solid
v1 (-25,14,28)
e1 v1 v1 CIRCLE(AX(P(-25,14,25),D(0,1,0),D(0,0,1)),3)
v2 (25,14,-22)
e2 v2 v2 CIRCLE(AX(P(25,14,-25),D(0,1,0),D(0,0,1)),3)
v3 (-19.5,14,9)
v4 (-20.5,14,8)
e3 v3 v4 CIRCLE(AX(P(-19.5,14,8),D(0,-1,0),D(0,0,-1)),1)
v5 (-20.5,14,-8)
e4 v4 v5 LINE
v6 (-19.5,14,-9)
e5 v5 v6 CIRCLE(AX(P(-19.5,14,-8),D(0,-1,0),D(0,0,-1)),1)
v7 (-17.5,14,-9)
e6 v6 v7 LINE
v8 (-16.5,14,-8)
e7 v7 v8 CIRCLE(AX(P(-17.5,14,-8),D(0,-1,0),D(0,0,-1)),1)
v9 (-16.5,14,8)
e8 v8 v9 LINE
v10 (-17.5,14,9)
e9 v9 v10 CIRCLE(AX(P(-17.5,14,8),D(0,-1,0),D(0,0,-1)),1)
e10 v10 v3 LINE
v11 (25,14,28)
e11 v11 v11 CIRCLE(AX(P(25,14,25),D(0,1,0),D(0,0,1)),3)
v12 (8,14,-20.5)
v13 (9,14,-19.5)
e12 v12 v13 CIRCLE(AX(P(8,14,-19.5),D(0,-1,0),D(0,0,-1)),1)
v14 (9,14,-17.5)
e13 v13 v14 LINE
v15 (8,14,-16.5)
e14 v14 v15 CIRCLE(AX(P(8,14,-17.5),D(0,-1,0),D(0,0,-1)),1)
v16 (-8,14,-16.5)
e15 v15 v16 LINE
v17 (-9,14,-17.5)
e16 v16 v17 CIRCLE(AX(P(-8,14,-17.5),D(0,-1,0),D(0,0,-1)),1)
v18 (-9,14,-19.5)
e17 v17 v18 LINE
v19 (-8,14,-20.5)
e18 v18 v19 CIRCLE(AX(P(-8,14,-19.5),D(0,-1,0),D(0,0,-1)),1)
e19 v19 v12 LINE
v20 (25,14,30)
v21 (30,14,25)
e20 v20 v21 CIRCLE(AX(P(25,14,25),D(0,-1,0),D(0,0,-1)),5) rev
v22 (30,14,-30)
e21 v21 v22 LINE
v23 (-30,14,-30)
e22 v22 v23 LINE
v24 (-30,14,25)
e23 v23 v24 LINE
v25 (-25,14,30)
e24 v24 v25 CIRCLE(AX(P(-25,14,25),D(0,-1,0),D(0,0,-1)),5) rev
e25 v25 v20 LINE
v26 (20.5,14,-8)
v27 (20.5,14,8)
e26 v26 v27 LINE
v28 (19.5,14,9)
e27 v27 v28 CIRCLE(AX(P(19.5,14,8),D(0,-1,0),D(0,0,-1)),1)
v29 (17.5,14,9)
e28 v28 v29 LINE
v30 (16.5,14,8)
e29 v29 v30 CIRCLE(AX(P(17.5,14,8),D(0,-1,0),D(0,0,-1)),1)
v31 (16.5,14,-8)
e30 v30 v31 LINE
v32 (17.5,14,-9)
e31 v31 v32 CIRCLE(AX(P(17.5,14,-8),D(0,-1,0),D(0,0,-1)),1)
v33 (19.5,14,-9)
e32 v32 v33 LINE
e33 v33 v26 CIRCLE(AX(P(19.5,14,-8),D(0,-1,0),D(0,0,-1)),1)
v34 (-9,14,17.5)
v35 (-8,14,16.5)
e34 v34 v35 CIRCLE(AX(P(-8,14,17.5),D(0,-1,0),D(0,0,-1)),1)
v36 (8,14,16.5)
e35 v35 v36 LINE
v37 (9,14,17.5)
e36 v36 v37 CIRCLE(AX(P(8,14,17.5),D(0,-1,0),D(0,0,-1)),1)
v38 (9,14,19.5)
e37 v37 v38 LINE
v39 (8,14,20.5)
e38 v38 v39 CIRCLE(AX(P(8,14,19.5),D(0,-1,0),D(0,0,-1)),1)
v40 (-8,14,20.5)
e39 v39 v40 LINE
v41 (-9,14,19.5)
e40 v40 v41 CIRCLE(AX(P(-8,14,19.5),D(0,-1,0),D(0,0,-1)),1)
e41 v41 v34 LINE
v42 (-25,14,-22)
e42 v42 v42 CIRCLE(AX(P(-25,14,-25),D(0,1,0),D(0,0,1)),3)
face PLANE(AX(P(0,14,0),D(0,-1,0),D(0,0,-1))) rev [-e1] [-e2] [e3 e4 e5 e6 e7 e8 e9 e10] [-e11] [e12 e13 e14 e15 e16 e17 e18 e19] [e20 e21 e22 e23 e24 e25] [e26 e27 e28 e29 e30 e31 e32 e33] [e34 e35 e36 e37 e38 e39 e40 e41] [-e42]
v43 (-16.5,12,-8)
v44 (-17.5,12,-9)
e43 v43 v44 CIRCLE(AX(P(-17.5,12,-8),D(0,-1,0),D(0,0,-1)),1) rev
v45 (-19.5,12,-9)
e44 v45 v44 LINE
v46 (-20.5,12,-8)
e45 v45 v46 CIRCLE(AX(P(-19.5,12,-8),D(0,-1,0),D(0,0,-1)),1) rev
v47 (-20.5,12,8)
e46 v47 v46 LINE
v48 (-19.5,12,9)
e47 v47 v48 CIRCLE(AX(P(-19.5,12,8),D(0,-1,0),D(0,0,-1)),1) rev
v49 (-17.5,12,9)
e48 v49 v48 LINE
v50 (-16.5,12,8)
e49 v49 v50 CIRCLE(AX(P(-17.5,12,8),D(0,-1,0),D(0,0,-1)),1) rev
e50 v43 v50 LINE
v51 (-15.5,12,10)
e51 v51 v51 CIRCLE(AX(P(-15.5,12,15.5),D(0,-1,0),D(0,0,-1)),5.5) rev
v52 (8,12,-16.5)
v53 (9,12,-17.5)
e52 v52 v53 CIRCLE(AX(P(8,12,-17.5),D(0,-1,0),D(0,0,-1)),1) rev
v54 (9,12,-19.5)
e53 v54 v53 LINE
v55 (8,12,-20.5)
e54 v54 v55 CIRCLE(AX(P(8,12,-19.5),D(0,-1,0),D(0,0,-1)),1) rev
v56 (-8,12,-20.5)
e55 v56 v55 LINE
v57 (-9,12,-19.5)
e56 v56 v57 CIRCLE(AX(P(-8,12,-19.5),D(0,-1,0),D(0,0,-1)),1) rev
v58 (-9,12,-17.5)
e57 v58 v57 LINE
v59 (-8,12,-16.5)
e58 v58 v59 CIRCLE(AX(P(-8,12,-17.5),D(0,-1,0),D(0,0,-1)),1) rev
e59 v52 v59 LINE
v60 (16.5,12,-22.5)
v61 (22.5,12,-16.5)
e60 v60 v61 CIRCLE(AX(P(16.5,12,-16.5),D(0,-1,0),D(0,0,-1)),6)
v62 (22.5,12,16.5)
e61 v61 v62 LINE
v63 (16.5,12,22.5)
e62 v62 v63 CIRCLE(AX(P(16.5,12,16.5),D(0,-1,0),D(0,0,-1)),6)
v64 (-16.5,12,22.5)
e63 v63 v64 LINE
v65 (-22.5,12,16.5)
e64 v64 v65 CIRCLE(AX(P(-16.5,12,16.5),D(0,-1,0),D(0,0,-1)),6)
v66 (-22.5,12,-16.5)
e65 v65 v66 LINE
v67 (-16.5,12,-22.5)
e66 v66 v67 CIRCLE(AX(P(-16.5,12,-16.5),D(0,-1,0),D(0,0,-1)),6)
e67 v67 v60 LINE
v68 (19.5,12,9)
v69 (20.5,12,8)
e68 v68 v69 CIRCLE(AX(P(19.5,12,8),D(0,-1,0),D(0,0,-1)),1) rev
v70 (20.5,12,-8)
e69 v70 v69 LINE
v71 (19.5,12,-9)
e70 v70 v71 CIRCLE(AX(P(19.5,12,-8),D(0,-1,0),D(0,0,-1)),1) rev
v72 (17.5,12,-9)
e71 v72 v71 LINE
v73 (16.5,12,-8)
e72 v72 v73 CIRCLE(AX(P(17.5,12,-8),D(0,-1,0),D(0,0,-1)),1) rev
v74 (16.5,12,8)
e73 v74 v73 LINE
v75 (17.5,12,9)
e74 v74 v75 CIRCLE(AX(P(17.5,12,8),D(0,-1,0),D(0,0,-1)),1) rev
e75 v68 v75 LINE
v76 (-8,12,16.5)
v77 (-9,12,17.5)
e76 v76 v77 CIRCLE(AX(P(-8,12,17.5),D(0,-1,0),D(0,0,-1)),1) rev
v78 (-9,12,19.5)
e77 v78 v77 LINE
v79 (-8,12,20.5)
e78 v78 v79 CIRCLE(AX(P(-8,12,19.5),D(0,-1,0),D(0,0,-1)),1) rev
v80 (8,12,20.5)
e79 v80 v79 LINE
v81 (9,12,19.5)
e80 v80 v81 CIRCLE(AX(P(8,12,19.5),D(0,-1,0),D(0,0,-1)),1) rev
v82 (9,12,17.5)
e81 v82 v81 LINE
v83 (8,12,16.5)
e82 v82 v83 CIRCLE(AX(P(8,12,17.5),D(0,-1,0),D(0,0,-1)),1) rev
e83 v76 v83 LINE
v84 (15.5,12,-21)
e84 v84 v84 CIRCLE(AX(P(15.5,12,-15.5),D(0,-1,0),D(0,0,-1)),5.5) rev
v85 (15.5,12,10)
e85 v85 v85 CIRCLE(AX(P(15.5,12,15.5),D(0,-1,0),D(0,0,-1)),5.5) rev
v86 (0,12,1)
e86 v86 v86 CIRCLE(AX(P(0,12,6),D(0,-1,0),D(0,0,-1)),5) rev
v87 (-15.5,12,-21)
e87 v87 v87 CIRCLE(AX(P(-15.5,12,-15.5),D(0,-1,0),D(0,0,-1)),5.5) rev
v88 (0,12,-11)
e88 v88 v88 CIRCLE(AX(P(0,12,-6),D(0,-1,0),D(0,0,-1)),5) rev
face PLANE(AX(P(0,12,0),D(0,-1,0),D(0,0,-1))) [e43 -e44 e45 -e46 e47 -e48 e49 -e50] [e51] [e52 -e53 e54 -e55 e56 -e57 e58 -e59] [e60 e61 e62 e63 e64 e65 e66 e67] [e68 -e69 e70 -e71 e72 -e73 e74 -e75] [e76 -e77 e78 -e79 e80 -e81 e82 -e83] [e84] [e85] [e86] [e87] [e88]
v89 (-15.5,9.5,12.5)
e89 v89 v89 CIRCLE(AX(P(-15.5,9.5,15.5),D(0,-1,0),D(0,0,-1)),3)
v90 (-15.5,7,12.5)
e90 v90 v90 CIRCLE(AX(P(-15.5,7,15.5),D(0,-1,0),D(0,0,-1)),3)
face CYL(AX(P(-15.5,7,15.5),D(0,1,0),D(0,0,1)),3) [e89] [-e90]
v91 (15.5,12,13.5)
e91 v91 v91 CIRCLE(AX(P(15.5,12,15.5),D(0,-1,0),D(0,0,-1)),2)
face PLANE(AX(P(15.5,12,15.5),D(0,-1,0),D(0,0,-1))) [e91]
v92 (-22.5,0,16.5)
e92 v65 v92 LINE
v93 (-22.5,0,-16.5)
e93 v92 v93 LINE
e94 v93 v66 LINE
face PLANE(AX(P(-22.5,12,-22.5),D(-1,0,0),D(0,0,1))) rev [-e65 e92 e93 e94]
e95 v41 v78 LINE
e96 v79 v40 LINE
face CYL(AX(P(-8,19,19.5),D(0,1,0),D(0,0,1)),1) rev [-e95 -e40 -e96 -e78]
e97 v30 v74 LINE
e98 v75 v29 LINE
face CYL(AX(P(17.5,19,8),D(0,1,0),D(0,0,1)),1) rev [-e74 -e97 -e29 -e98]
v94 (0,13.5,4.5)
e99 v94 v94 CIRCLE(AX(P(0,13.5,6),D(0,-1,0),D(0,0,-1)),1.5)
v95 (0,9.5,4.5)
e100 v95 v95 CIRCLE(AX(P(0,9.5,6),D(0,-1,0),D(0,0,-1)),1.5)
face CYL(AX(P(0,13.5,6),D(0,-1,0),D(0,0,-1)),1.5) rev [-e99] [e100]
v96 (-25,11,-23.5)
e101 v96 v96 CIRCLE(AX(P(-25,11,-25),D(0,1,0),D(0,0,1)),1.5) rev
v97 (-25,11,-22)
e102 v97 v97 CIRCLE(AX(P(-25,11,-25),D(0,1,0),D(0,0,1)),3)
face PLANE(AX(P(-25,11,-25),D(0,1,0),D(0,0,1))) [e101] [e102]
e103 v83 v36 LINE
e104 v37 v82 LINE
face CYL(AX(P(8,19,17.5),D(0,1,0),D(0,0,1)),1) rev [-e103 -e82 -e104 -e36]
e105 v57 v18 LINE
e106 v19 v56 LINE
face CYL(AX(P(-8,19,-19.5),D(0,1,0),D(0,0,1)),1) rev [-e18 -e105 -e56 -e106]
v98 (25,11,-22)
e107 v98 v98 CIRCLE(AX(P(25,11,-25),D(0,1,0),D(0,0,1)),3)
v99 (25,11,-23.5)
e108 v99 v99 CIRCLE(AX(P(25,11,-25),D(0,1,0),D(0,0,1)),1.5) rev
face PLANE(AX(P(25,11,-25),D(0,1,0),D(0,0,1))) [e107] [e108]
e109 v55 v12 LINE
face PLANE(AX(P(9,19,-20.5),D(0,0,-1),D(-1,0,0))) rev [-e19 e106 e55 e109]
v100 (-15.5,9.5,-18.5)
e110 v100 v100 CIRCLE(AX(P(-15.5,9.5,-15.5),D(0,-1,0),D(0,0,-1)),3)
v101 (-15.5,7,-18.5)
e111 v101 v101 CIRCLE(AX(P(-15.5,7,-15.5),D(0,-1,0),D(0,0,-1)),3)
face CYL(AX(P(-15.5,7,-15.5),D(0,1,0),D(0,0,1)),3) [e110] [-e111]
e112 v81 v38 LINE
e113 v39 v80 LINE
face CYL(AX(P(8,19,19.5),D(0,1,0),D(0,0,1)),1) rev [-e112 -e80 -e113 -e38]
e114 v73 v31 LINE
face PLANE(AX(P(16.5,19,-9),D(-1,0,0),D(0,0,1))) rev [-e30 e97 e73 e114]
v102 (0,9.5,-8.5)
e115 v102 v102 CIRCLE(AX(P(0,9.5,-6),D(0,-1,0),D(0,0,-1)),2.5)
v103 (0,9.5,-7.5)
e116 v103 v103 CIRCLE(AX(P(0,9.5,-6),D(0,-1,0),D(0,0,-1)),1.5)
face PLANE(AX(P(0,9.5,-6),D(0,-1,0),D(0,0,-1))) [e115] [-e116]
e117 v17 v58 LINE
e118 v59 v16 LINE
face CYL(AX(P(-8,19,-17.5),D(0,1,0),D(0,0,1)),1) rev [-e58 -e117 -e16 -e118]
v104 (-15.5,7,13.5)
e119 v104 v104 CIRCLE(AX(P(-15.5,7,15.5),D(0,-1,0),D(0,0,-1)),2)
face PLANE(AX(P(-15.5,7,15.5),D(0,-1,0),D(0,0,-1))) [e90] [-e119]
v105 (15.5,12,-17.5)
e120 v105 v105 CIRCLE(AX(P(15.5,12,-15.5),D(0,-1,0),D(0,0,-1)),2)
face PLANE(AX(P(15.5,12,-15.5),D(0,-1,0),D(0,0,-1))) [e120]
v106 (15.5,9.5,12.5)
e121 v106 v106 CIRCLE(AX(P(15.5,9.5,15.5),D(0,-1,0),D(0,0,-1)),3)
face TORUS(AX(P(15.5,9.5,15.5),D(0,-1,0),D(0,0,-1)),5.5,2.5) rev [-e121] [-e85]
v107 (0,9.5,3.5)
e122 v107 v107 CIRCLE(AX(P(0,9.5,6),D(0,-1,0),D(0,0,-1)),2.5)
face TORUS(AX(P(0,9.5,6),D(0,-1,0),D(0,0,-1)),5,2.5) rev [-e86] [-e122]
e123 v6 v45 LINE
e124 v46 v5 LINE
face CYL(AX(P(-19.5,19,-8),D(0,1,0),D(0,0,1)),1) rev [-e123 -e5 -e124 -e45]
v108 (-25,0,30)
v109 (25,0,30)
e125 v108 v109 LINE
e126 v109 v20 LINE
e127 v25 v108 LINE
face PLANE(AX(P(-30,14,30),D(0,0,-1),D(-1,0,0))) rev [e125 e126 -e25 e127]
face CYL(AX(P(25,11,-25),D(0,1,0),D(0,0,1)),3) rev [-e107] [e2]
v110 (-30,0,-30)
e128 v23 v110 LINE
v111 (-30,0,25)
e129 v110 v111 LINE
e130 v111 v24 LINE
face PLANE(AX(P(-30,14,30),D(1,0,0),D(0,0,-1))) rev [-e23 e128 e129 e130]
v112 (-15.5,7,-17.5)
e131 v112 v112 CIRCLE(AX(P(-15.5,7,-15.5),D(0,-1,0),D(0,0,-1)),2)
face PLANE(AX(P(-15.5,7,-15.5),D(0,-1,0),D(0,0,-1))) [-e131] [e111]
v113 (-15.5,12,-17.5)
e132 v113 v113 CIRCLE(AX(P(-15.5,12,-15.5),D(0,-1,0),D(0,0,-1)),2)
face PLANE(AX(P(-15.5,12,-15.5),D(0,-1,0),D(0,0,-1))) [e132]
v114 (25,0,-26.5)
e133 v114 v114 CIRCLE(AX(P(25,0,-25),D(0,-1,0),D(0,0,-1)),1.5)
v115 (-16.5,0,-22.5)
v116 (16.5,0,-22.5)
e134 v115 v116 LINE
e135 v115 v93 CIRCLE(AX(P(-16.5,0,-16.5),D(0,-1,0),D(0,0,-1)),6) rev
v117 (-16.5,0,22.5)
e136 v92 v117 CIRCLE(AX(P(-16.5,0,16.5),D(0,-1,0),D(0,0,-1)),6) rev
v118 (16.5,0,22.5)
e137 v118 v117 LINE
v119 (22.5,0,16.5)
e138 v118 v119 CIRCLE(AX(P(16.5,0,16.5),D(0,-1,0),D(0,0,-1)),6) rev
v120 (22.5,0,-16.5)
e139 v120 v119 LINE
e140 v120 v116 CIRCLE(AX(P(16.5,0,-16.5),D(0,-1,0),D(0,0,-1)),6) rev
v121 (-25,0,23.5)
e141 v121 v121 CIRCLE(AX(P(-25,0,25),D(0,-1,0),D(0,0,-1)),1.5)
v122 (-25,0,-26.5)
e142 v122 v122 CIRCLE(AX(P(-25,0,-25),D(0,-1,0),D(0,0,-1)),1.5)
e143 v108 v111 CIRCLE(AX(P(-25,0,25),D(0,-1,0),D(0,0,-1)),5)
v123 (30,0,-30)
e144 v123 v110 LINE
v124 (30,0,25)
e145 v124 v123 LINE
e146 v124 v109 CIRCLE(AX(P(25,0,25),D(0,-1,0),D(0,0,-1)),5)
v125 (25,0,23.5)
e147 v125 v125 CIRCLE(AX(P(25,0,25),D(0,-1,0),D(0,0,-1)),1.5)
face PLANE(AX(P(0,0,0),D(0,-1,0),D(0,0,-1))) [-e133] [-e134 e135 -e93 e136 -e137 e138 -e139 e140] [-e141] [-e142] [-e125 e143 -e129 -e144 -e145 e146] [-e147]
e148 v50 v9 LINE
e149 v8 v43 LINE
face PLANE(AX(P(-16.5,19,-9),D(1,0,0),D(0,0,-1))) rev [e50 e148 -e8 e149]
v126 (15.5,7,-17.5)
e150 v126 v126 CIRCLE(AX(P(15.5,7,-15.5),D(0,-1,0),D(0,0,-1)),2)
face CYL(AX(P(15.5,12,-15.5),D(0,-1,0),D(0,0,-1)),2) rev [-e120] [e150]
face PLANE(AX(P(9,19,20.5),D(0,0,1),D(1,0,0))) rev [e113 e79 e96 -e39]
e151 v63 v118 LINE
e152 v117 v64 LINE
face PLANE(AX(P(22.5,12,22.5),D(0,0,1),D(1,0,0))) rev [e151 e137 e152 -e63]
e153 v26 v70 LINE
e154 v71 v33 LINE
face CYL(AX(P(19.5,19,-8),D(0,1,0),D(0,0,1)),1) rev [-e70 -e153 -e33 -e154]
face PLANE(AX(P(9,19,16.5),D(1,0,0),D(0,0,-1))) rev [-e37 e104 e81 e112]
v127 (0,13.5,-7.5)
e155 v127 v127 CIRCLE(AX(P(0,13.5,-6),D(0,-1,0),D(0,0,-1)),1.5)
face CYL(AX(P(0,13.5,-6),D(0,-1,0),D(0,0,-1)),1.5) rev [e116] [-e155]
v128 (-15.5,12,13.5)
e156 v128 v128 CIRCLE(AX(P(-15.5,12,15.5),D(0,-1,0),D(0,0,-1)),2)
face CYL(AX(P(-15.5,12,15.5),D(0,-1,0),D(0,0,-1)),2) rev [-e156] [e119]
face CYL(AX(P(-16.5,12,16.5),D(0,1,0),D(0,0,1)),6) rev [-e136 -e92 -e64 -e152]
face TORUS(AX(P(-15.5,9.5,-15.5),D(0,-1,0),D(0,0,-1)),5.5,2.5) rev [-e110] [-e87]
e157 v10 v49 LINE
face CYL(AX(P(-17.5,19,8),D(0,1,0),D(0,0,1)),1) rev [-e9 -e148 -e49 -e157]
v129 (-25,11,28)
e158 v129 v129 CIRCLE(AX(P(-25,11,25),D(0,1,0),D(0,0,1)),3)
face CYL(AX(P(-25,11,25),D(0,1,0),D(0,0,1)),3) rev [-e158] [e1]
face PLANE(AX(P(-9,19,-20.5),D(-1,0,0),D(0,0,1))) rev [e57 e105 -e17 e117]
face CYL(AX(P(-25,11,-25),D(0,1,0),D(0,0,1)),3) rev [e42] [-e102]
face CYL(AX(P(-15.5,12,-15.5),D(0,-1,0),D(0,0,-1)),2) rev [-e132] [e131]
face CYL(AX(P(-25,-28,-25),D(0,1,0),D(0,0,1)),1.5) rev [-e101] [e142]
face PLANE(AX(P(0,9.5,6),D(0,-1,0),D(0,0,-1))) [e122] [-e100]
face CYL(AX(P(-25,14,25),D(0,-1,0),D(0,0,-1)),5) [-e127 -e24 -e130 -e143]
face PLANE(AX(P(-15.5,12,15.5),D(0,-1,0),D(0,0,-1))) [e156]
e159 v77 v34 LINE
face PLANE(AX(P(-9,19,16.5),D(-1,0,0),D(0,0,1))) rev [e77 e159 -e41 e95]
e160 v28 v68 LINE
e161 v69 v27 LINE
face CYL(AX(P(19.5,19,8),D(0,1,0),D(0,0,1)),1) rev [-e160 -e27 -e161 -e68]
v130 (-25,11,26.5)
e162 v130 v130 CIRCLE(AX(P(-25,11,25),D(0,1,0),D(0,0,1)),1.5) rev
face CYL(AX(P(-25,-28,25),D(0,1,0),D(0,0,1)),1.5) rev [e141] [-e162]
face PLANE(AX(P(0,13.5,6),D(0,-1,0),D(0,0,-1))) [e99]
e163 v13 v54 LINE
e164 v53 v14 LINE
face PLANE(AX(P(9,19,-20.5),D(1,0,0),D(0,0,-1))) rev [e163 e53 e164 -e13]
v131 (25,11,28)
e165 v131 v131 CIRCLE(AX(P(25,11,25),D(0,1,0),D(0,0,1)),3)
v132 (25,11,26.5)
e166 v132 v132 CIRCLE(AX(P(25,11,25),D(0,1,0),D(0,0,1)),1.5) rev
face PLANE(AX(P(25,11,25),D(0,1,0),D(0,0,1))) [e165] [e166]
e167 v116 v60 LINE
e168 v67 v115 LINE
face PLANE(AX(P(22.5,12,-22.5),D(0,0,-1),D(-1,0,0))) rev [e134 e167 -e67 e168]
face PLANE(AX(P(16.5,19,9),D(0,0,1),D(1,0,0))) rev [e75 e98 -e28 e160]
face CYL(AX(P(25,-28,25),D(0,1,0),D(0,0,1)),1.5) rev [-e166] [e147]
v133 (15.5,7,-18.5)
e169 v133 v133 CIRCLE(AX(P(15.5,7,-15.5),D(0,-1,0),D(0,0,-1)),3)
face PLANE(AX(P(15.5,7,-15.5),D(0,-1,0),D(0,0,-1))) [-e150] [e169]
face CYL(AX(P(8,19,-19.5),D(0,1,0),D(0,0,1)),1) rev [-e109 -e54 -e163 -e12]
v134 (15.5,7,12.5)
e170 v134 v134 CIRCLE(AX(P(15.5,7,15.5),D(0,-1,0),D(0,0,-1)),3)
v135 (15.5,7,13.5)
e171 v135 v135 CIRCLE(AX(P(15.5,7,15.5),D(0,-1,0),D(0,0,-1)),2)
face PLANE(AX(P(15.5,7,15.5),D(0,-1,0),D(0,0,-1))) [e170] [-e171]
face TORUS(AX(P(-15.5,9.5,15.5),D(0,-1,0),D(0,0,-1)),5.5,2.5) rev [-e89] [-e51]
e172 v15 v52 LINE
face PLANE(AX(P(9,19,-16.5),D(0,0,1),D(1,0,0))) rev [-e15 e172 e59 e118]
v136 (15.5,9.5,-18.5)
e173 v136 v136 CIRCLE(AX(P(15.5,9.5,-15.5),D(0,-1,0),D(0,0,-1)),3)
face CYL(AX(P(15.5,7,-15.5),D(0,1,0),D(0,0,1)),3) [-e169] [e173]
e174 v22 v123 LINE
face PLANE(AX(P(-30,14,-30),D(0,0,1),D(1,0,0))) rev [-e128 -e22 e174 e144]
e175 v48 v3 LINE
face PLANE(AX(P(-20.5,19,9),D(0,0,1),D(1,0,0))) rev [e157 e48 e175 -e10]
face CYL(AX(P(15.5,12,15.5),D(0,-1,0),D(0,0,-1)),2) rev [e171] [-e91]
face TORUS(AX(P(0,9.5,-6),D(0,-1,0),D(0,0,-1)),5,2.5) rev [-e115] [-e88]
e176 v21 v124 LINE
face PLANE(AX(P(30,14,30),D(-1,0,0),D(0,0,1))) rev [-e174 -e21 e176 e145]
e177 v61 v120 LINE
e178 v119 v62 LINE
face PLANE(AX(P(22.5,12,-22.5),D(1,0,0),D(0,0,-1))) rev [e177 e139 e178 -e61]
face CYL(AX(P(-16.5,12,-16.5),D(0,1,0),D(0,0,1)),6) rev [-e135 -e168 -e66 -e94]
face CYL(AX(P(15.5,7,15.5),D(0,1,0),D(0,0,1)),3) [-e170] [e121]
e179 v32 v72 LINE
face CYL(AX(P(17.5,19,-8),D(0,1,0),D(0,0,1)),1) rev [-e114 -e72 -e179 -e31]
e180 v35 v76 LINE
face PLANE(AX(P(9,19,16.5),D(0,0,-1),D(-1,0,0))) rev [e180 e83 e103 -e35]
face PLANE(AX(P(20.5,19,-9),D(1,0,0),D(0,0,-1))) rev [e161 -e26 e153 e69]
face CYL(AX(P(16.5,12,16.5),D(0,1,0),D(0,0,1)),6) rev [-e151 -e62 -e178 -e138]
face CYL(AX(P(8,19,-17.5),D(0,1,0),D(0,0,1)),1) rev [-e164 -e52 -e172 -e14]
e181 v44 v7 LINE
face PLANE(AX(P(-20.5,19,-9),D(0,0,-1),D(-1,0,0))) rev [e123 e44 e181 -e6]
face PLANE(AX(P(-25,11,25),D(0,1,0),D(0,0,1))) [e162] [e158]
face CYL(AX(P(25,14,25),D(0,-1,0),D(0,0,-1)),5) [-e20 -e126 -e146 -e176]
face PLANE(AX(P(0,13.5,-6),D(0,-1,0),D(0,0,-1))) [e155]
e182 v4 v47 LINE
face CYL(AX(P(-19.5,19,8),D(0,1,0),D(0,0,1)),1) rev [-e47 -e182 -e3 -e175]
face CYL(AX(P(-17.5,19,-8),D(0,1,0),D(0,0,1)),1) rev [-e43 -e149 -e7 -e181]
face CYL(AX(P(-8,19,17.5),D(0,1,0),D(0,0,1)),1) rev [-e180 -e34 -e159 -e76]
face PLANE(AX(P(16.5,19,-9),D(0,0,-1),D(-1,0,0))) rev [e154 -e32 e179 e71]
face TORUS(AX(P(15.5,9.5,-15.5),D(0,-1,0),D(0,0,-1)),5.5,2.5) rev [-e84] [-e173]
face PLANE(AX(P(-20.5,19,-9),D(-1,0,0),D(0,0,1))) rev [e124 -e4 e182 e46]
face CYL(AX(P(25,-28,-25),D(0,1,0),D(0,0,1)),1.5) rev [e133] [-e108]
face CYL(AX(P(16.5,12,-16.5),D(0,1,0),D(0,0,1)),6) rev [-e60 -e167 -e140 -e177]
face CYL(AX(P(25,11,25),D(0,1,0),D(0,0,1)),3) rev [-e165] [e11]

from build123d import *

# Parameters (mm, degrees)
SKETCH1_W           = 60
SKETCH1_H           = 60
BOSS_EXTRUDE1_DEPTH = 14
SKETCH2_R           = 1.5
CUT_EXTRUDE1_DEPTH  = 42
SKETCH3_R           = 3
CUT_EXTRUDE2_DEPTH  = 3
SKETCH4_W           = 45
SKETCH4_H           = 45
CUT_EXTRUDE3_DEPTH  = 12
SKETCH5_W           = 18
SKETCH5_H           = 4
SKETCH5_W_2         = 4
SKETCH5_H_2         = 18
CUT_EXTRUDE4_DEPTH  = 7
SKETCH6_R           = 2.5
BOSS_EXTRUDE2_DEPTH = 2.5
SKETCH7_R           = 1.5
CUT_EXTRUDE5_DEPTH  = 4
FILLET1_R           = 2.5
SKETCH8_R           = 3
BOSS_EXTRUDE3_DEPTH = 5
FILLET2_R           = 2.5
SKETCH9_R           = 2
CUT_EXTRUDE6_DEPTH  = 5
FILLET3_R           = 1
FILLET4_R           = 6
FILLET5_R           = 5


with BuildPart() as part:
    # Sketch1 → Boss-Extrude1 (new body)
    with BuildSketch(Plane(origin=(0, 0, 0), x_dir=(1, 0, 0), z_dir=(0, 1, 0))):
        Rectangle(SKETCH1_W, SKETCH1_H)
    extrude(amount=BOSS_EXTRUDE1_DEPTH)

    # Sketch2 → Cut-Extrude1 (cut)
    with BuildSketch(Plane(origin=(0, 14, 0), x_dir=(1, 0, 0), z_dir=(0, 1, 0))):
        with Locations(Location((-25, 25, 0), (0, 0, 270))):
            Circle(SKETCH2_R)
        with Locations(Location((-25, -25, 0), (0, 0, 270))):
            Circle(SKETCH2_R)
        with Locations(Location((25, -25, 0), (0, 0, 270))):
            Circle(SKETCH2_R)
        with Locations(Location((25, 25, 0), (0, 0, 270))):
            Circle(SKETCH2_R)
    extrude(amount=-CUT_EXTRUDE1_DEPTH, mode=Mode.SUBTRACT)

    # Sketch3 → Cut-Extrude2 (cut)
    with BuildSketch(Plane(origin=(0, 14, 0), x_dir=(1, 0, 0), z_dir=(0, 1, 0))):
        with Locations(Location((-25, 25, 0), (0, 0, 270))):
            Circle(SKETCH3_R)
        with Locations(Location((-25, -25, 0), (0, 0, 270))):
            Circle(SKETCH3_R)
        with Locations(Location((25, -25, 0), (0, 0, 270))):
            Circle(SKETCH3_R)
        with Locations(Location((25, 25, 0), (0, 0, 270))):
            Circle(SKETCH3_R)
    extrude(amount=-CUT_EXTRUDE2_DEPTH, mode=Mode.SUBTRACT)

    # Sketch4 → Cut-Extrude3 (cut)
    with BuildSketch(Plane.XZ):
        Rectangle(SKETCH4_W, SKETCH4_H)
    extrude(amount=-CUT_EXTRUDE3_DEPTH, mode=Mode.SUBTRACT)

    # Sketch5 → Cut-Extrude4 (cut)
    with BuildSketch(Plane.XZ.offset(-12)):
        with Locations((0, 18.5)):
            Rectangle(SKETCH5_W, SKETCH5_H)
        with Locations((0, -18.5)):
            Rectangle(SKETCH5_W, SKETCH5_H)
        with Locations((-18.5, 0)):
            Rectangle(SKETCH5_W_2, SKETCH5_H_2)
        with Locations((18.5, 0)):
            Rectangle(SKETCH5_W_2, SKETCH5_H_2)
    extrude(amount=-CUT_EXTRUDE4_DEPTH, mode=Mode.SUBTRACT)

    # Sketch6 → Boss-Extrude2 (add)
    with BuildSketch(Plane.XZ.offset(-12)):
        with Locations(Location((0, 6, 0), (0, 0, 270))):
            Circle(SKETCH6_R)
        with Locations(Location((0, -6, 0), (0, 0, 270))):
            Circle(SKETCH6_R)
    extrude(amount=BOSS_EXTRUDE2_DEPTH)

    # Sketch7 → Cut-Extrude5 (cut)
    with BuildSketch(Plane.XZ.offset(-9.5)):
        with Locations(Location((0, 6, 0), (0, 0, 270))):
            Circle(SKETCH7_R)
        with Locations(Location((0, -6, 0), (0, 0, 270))):
            Circle(SKETCH7_R)
    extrude(amount=-CUT_EXTRUDE5_DEPTH, mode=Mode.SUBTRACT)

    # Fillet1
    fillet1_edges = [part.edges().sort_by_distance(p)[0] for p in [
        (0, 12, 8.5),
        (0, 12, -3.5),
    ]]
    fillet(fillet1_edges, radius=FILLET1_R - 0.0001)  # a hair under: the kernel refuses the full size

    # Sketch8 → Boss-Extrude3 (add)
    with BuildSketch(Plane.XZ.offset(-12)):
        with Locations(Location((-15.5, 15.5, 0), (0, 0, 270))):
            Circle(SKETCH8_R)
        with Locations(Location((15.5, 15.5, 0), (0, 0, 270))):
            Circle(SKETCH8_R)
        with Locations(Location((15.5, -15.5, 0), (0, 0, 270))):
            Circle(SKETCH8_R)
        with Locations(Location((-15.5, -15.5, 0), (0, 0, 270))):
            Circle(SKETCH8_R)
    extrude(amount=BOSS_EXTRUDE3_DEPTH)

    # Fillet2
    fillet2_edges = [part.edges().sort_by_distance(p)[0] for p in [
        (-15.5, 12, -12.5),
        (15.5, 12, -12.5),
        (15.5, 12, 18.5),
        (-15.5, 12, 18.5),
    ]]
    fillet(fillet2_edges, radius=FILLET2_R)

    # Sketch9 → Cut-Extrude6 (cut)
    with BuildSketch(Plane.XZ.offset(-7)):
        with Locations(Location((-15.5, 15.5, 0), (0, 0, 270))):
            Circle(SKETCH9_R)
        with Locations(Location((-15.5, -15.5, 0), (0, 0, 270))):
            Circle(SKETCH9_R)
        with Locations(Location((15.5, -15.5, 0), (0, 0, 270))):
            Circle(SKETCH9_R)
        with Locations(Location((15.5, 15.5, 0), (0, 0, 270))):
            Circle(SKETCH9_R)
    extrude(amount=-CUT_EXTRUDE6_DEPTH, mode=Mode.SUBTRACT)

    # Fillet3
    fillet3_edges = [part.edges().sort_by_distance(p)[0] for p in [
        (9, 13, -16.5),
        (9, 13, -20.5),
        (-16.5, 13, 9),
        (-16.5, 13, -9),
        (-20.5, 13, -9),
        (-20.5, 13, 9),
        (20.5, 13, 9),
        (20.5, 13, -9),
        (16.5, 13, -9),
        (16.5, 13, 9),
        (-9, 13, 16.5),
        (-9, 13, 20.5),
        (9, 13, 20.5),
        (9, 13, 16.5),
        (-9, 13, -20.5),
        (-9, 13, -16.5),
    ]]
    fillet(fillet3_edges, radius=FILLET3_R)

    # Fillet4
    fillet4_edges = [part.edges().sort_by_distance(p)[0] for p in [
        (-22.5, 6, -22.5),
        (-22.5, 6, 22.5),
        (22.5, 6, 22.5),
        (22.5, 6, -22.5),
    ]]
    fillet(fillet4_edges, radius=FILLET4_R)

    # Fillet5
    fillet5_edges = [part.edges().sort_by_distance(p)[0] for p in [
        (30, 7, 30),
        (-30, 7, 30),
    ]]
    fillet(fillet5_edges, radius=FILLET5_R)


solid = part.part
